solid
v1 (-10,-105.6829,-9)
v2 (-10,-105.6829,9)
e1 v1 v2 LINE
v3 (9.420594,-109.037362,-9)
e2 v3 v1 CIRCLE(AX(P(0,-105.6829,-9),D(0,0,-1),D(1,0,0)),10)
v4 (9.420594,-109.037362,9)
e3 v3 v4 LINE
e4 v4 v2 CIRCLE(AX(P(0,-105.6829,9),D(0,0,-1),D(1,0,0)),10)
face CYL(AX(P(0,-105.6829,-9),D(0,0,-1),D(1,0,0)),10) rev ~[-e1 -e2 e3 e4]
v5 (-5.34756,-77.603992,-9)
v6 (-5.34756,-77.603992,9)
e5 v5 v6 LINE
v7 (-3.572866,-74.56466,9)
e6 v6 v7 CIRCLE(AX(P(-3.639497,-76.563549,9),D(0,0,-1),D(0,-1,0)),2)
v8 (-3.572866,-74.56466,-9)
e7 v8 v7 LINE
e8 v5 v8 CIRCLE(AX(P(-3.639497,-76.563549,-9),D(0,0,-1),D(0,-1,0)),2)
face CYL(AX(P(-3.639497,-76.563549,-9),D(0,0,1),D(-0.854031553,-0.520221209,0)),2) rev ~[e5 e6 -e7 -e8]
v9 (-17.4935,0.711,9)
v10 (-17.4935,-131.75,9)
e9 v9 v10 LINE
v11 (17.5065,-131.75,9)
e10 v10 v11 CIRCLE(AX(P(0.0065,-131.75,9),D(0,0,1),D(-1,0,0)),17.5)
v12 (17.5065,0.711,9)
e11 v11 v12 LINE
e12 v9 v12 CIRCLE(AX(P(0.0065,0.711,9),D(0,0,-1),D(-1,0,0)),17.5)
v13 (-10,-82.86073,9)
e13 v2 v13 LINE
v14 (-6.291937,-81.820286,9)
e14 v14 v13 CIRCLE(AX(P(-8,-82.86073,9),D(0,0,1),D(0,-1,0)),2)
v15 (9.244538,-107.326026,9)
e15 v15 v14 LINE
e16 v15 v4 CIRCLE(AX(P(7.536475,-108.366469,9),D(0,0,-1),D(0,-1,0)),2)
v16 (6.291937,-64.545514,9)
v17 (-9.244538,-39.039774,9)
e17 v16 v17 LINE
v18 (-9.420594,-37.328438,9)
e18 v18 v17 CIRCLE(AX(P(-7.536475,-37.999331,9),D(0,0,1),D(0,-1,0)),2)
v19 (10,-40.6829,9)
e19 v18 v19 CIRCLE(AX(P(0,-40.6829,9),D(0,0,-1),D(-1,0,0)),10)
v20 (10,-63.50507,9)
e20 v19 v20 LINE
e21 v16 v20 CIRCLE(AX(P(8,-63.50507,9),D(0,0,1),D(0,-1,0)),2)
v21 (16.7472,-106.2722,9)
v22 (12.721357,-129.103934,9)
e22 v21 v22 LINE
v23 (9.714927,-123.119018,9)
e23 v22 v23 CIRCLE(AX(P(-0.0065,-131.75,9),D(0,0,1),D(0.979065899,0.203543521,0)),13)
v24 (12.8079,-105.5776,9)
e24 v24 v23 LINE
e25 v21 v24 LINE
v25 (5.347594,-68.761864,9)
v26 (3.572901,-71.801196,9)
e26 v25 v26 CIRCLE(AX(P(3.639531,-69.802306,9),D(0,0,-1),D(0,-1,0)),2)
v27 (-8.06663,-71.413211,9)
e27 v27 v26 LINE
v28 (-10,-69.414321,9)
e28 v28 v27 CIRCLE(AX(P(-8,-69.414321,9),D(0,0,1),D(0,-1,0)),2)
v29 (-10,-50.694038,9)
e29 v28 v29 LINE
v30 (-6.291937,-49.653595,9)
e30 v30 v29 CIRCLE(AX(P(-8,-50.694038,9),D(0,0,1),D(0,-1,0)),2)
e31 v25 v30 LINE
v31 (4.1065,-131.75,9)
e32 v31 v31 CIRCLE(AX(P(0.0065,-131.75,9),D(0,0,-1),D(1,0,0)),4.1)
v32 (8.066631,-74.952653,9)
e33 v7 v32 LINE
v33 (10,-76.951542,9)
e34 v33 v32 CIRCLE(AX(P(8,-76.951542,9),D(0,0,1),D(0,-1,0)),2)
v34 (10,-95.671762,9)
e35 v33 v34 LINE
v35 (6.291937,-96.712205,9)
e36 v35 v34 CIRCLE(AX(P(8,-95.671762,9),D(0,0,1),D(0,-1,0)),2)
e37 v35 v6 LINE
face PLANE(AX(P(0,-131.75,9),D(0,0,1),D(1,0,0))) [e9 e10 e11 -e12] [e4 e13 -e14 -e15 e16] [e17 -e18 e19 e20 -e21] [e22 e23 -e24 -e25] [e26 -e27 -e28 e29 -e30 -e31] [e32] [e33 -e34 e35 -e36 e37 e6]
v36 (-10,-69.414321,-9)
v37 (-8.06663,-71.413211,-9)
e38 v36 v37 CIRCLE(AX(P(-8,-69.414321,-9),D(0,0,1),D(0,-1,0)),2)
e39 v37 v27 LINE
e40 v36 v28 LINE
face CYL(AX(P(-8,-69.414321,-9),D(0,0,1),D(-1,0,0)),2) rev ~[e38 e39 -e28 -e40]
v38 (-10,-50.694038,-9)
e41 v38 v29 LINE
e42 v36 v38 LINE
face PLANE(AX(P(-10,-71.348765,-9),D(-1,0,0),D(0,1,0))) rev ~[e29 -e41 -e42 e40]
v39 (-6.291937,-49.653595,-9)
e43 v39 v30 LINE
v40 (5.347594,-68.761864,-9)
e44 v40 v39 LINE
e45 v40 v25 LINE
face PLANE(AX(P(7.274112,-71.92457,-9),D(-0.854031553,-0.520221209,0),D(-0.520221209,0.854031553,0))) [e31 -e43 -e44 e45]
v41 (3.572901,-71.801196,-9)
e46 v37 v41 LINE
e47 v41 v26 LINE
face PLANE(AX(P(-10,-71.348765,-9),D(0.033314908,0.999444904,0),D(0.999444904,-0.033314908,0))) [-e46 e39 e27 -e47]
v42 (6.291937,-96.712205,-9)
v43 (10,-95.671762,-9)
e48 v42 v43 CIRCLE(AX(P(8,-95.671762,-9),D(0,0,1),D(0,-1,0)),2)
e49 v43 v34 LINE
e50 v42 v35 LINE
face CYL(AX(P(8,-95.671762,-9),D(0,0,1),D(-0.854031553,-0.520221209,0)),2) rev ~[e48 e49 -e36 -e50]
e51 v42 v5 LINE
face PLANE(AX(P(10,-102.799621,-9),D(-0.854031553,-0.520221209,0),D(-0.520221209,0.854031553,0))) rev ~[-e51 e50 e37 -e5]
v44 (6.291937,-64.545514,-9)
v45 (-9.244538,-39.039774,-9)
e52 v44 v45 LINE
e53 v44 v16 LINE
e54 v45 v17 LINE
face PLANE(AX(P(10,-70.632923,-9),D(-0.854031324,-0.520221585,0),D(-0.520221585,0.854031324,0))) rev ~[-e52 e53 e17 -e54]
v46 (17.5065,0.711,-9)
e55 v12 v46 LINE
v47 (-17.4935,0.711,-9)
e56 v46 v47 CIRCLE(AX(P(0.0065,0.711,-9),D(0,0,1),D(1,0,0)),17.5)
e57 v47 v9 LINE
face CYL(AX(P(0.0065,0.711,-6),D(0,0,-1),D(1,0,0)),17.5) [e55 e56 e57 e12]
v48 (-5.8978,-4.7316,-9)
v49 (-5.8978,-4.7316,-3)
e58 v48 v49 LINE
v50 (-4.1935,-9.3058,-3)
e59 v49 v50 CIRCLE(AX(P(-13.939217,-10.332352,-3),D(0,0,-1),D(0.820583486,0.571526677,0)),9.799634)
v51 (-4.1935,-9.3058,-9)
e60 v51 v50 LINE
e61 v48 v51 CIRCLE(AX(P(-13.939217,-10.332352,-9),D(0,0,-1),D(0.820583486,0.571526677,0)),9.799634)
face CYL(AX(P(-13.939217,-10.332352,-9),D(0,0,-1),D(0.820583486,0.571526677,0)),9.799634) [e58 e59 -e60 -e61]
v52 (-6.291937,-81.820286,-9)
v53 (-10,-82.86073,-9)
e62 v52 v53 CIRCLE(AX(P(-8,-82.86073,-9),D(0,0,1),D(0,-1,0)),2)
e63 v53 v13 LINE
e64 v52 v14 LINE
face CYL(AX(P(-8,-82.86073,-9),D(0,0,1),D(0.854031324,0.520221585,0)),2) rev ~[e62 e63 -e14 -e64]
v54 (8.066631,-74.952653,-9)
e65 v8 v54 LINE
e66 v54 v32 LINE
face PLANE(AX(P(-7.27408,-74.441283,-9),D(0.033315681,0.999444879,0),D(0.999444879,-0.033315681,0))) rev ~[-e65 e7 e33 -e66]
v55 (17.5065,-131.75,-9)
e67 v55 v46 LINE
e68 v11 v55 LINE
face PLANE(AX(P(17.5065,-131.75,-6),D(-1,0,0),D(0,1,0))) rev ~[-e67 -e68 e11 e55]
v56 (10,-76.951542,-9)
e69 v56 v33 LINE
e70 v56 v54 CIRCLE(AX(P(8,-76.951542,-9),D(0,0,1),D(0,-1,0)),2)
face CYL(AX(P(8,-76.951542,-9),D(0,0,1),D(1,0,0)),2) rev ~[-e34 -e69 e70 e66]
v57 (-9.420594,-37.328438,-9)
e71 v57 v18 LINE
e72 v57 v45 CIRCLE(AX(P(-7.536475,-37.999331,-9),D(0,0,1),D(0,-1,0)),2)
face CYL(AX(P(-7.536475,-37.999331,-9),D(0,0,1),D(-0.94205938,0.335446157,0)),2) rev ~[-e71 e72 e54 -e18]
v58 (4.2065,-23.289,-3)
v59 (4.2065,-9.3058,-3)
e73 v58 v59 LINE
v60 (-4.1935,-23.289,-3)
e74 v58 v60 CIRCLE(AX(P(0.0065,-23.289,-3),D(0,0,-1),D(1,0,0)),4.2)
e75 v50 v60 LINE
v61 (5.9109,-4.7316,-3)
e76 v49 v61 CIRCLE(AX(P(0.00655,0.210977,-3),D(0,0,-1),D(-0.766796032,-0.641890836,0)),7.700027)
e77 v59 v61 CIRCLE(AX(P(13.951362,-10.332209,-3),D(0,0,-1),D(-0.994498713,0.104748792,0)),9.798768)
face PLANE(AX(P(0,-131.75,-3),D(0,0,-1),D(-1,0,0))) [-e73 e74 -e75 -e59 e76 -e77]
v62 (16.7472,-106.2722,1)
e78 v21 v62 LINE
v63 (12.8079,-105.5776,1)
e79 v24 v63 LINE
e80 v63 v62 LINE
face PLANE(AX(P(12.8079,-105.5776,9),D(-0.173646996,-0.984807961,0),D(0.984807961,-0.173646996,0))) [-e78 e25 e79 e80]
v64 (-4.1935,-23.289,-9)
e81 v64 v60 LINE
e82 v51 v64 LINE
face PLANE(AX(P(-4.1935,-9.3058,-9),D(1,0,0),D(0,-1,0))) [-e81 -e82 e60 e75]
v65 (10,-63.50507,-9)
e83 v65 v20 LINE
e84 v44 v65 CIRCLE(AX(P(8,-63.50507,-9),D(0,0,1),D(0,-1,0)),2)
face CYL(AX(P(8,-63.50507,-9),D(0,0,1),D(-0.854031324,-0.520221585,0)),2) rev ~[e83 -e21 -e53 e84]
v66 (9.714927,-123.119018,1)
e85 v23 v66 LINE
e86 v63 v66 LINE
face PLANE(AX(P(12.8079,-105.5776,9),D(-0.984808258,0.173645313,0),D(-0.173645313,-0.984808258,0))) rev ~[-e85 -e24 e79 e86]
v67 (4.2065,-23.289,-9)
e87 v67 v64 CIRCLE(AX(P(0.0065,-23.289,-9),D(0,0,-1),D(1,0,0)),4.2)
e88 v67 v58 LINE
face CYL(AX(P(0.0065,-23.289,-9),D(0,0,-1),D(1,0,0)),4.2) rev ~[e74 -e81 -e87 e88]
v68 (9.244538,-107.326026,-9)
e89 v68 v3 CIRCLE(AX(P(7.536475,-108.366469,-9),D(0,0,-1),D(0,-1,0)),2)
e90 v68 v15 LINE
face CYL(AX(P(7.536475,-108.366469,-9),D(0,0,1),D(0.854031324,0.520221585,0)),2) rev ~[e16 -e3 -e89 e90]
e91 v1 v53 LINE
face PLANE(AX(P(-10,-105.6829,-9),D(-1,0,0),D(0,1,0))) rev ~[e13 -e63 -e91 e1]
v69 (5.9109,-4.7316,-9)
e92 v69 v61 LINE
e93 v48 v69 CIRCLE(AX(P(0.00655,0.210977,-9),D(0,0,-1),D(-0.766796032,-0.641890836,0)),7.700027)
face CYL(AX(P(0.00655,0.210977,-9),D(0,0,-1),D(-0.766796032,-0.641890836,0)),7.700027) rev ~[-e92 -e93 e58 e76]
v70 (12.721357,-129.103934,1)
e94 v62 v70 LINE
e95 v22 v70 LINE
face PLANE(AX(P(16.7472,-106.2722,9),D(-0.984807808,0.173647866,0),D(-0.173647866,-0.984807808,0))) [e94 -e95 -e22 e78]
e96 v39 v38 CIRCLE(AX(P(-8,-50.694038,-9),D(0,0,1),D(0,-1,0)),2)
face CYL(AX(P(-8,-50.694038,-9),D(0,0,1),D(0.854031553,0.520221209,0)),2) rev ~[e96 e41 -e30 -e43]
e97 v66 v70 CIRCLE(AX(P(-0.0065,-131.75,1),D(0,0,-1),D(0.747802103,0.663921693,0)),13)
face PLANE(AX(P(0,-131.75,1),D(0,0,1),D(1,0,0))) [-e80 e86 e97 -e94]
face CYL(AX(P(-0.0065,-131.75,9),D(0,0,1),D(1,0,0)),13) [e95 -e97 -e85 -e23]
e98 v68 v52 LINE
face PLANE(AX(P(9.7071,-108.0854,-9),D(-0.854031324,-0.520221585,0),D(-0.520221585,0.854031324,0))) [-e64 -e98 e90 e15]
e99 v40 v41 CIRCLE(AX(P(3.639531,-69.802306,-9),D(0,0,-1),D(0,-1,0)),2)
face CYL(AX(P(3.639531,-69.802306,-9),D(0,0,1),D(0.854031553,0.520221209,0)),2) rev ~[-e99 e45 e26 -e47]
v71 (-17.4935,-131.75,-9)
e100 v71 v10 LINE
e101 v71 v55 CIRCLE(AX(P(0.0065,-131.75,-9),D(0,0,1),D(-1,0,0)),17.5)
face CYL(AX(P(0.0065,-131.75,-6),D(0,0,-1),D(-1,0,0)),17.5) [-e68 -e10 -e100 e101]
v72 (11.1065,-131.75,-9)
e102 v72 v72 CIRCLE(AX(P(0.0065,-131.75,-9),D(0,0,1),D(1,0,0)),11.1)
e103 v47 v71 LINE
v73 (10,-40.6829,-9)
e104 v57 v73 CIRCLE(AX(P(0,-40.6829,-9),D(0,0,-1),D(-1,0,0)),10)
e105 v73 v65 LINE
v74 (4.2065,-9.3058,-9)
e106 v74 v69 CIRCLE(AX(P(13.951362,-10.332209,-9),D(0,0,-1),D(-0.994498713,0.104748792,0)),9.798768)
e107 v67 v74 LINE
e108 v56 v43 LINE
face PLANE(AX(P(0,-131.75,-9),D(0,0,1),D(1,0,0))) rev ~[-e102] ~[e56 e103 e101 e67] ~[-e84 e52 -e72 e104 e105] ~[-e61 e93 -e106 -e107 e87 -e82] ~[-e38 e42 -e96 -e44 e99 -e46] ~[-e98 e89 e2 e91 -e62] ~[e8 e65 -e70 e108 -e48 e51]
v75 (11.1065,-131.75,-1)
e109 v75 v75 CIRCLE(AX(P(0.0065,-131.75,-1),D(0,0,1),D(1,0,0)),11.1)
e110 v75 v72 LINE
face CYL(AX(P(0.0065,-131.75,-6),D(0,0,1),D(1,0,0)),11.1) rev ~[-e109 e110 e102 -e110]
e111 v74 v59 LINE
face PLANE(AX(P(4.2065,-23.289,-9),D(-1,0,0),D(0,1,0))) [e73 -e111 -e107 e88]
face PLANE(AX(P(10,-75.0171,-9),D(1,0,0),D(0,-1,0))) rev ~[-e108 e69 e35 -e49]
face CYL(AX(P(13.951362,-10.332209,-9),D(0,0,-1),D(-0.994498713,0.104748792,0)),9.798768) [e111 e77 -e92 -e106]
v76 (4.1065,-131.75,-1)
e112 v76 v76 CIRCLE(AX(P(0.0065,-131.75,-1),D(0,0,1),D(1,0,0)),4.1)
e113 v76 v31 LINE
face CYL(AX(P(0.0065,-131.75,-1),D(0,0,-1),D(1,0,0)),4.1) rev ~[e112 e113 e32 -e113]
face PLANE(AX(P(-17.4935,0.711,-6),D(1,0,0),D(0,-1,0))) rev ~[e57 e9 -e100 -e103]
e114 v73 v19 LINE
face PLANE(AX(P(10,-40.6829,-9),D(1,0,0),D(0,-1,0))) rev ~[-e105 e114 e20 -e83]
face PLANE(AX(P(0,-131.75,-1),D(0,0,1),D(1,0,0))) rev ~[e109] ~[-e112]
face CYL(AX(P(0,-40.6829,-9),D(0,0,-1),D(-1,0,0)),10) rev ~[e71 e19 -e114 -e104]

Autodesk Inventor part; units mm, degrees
ref_plane "YZ Plane" through (0, 0, 0) normal (1, 0, 0) x (0, 1, 0)
ref_plane "XZ Plane" through (0, 0, 0) normal (0, 1, 0) x (-1, 0, 0)
ref_plane "XY Plane" through (0, 0, 0) normal (0, 0, 1) x (1, 0, 0)
sketch "Sketch1" plane through (0, 0, 0) normal (0, 0, 1) x (1, 0, 0)
  line L0 (0.0065, 132.461) -> (0.0065, 0) construction
  line L1 (-17.4935, 132.461) -> (-17.4935, 0)
  line L2 (17.5065, 0) -> (17.5065, 132.461)
  arc A0 (17.5065, 132.461) -> (-17.4935, 132.461) centre (0.0065, 132.461) ccw
  arc A1 (-17.4935, 0) -> (17.5065, 0) centre (0.0065, 0) ccw
  circle A2 centre (0.0065, 0) radius 11.1
  circle A3 centre (0.0065, 131.961) radius 7.5
  line L3 (4.0065, 131.961) -> (4.0065, 109.961)
  line L4 (4.0065, 109.961) -> (-3.9935, 109.961)
  line L5 (-3.9935, 109.961) -> (-3.9935, 131.961)
  line L6 (-3.9935, 131.961) -> (4.0065, 131.961)
  line L7 (0.0065, 101.721) -> (0.0065, -30.5)
  line L8 (0.0065, 131.961) -> (5.7519, 127.1401)
  line L9 (0.0065, 131.961) -> (0.0065, 124.461) construction
  arc A4 (5.7519, 127.1401) -> (4.0065, 122.4546) centre (13.9526, 121.4175) ccw
  line L10 (0.0065, 131.961) -> (-5.7388, 127.1401)
  arc A5 (-3.9935, 122.4546) -> (-5.7388, 127.1401) centre (-13.9395, 121.4175) ccw
  line L11 (0.0065, 132.461) -> (0.0065, 108.461) construction
  line L12 (4.0065, 132.461) -> (4.0065, 108.461)
  line L13 (-3.9935, 108.461) -> (-3.9935, 132.461)
  arc A6 (4.0065, 132.461) -> (-3.9935, 132.461) centre (0.0065, 132.461) ccw
  arc A7 (-3.9935, 108.461) -> (4.0065, 108.461) centre (0.0065, 108.461) ccw
  point P0 (0.0065, 131.961)
  point P1 (-3.9935, 122.4546)
  point P2 (-5.7388, 127.1401)
  point P3 (0.0065, 120.461)
  point P4 (-3.9935, 109.961)
  point P5 (4.0065, 109.961)
  dimension "d38" = 15
  dimension "d19" = 35
  dimension "d20" = 22.2
  dimension "d39" = 22
  dimension "d40" = 8
  dimension "d41" = 4
  dimension "d42" = 4
  dimension "d43" = 50
  dimension "d44" = 5
  dimension "d45" = 10
  dimension "d50" = 24
  dimension "d59" = 132.461
extrude "Extrusion1" add sketch "Sketch1" along normal mid plane 6
sketch "Sketch6" plane through (0, 0, 3) normal (0, 0, 1) x (1, 0, 0)
  arc A0 (-17.4935, 0) -> (17.5065, 0) centre (0.0065, 0) ccw projected
  line L0 (17.5065, 0) -> (17.5065, 132.461) projected
  arc A1 (17.5065, 132.461) -> (-17.4935, 132.461) centre (0.0065, 132.461) ccw projected
  line L1 (-17.4935, 132.461) -> (-17.4935, 0) projected
  arc A2 (-3.9935, 108.461) -> (4.0065, 108.461) centre (0.0065, 108.461) ccw projected
  line L2 (-3.9935, 108.461) -> (-3.9935, 122.4546) projected
  arc A3 (-3.9935, 122.4546) -> (-5.7388, 127.1401) centre (-13.9395, 121.4175) ccw projected
  arc A4 (5.7519, 127.1401) -> (-5.7388, 127.1401) centre (0.0065, 131.961) ccw projected
  arc A5 (5.7519, 127.1401) -> (4.0065, 122.4546) centre (13.9526, 121.4175) ccw projected
  line L3 (4.0065, 122.4546) -> (4.0065, 108.461) projected
  circle A6 centre (0.0065, 0) radius 11.1 projected
  point P0 (0, 0)
extrude "Extrusion4" add sketch "Sketch6" along normal blind 2 contours L1 A1 L0 A0 | L2 A3 A4 A5 L3 A2
sketch "Sketch7" plane through (0, 0, 5) normal (0, 0, 1) x (1, 0, 0)
  line L0 (0, 244.3) -> (0, -244.3) projected
  line L1 (17.5065, 0) -> (17.5065, 132.461) projected
  arc A0 (17.5065, 132.461) -> (-17.4935, 132.461) centre (0.0065, 132.461) ccw projected
  line L2 (-17.4935, 132.461) -> (-17.4935, 0) projected
  arc A1 (-17.4935, 0) -> (17.5065, 0) centre (0.0065, 0) ccw projected
  circle A2 centre (0.0065, 0) radius 11.1 projected
  circle A3 centre (0.0065, 0) radius 4.1
  point P0 (0, 0)
  point P1 (0, 11.1)
  point P2 (0, -11.1)
  point P3 (0, -17.5)
  point P4 (0, 149.961)
  dimension "d53" = 8.2
extrude "Extrusion5" add sketch "Sketch7" along normal blind 10 contours A0 L1 A1 L0 A2 | L0 A2 A1 L2 A0 | A2 L0 A3 | L0 A3 A2
sketch "Sketch9" plane through (0, 0, -3) normal (0, 0, -1) x (-1, 0, 0)
  line L0 (-4.0065, 122.4546) -> (-4.0065, 108.461) projected
  arc A0 (-4.0065, 108.461) -> (3.9935, 108.461) centre (-0.0065, 108.461) ccw projected
  line L1 (3.9935, 108.461) -> (3.9935, 122.4546) projected
  arc A1 (5.7388, 127.1401) -> (3.9935, 122.4546) centre (13.9395, 121.4175) ccw projected
  arc A2 (5.7388, 127.1401) -> (-5.7519, 127.1401) centre (-0.0065, 131.961) ccw projected
  arc A3 (-4.0065, 122.4546) -> (-5.7519, 127.1401) centre (-13.9526, 121.4175) ccw projected
  line L2 (4.1935, 122.4442) -> (4.1935, 108.461)
  arc A4 (-4.2065, 108.461) -> (4.1935, 108.461) centre (-0.0065, 108.461) ccw
  line L3 (-4.2065, 108.461) -> (-4.2065, 122.4442)
  arc A5 (-4.2065, 122.4442) -> (-5.9109, 127.0184) centre (-13.9526, 121.4175) ccw
  arc A6 (5.8978, 127.0184) -> (-5.9109, 127.0184) centre (-0.0065, 131.961) ccw
  arc A7 (5.8978, 127.0184) -> (4.1935, 122.4442) centre (13.9395, 121.4175) ccw
  point P0 (0, 0)
  dimension "d60" = 0.2
extrude "Extrusion7" cut sketch "Sketch9" against normal up to surface (6 mm away)
sketch "Sketch11" plane through (0, 0, 15) normal (0, 0, 1) x (1, 0, 0)
  line L0 (10.9002, -1.9232) -> (15.7624, 25.6515)
  line L1 (10.9002, -1.9232) -> (38.9002, -1.9232) construction
  circle A0 centre (-0.0065, 0) radius 11.075
  circle A1 centre (-0.0065, 0) radius 12
  line L2 (16.7472, 25.4778) -> (12.092, -0.9232)
  line L3 (12.8079, 26.1724) -> (7.325, -4.9232)
  circle A2 centre (-0.0065, 0) radius 13
  circle A3 centre (-0.0065, 0) radius 10
  line L4 (12.8079, 26.1724) -> (16.7472, 25.4778)
  point P0 (0, 0)
  point P1 (0, 0)
  point P2 (9.7149, 8.631)
  point P3 (12.7213, 2.6461)
  dimension "d74" = 28
  dimension "d75" = 80
  dimension "d76" = 24
  dimension "d77" = 1
  dimension "d78" = 3
  dimension "d80" = 2
extrude "Extrusion10" cut sketch "Sketch11" against normal blind 8 contours A2 L3 L4 L0 | L0 L4 L2 A2
sketch "Sketch13" plane through (0, 0, -3) normal (0, 0, -1) x (-1, 0, 0)
  line L0 (0, 101.0671) -> (0, 16.0671) construction
  line L1 (-10, 91.0671) -> (-10, 26.0671)
  line L2 (10, 26.0671) -> (10, 91.0671)
  arc A0 (10, 91.0671) -> (-10, 91.0671) centre (0, 91.0671) ccw
  arc A1 (-10, 26.0671) -> (10, 26.0671) centre (0, 26.0671) ccw
  line L3 (10, 26.0671) -> (10, 58.9004)
  line L4 (-10, 91.0671) -> (-10, 58.2338)
  line L5 (-10, 26.0671) -> (10, 58.9004)
  line L6 (10, 58.9004) -> (-10, 58.2338)
  line L7 (-10, 58.2338) -> (10, 91.0671)
  line L8 (33.0369, 58.1675) -> (-10, 56.7329)
  line L9 (32.9369, 61.1658) -> (-10.05, 59.7329)
  line L10 (-8.719, 57.4534) -> (11.281, 90.2868)
  line L11 (-11.281, 59.0141) -> (9.7071, 93.4696)
  line L12 (-9.7071, 23.6646) -> (11.281, 58.1201)
  line L13 (-11.281, 26.8474) -> (8.719, 59.6808)
  point P0 (0, 0)
  point P1 (0, 58.5671)
  point P2 (39.2224, 129.4846)
  point P3 (-10, 61.1171)
  point P4 (-10, 107.6003)
  point P5 (7.2741, 57.3087)
  point P6 (-10, 28.9505)
  point P7 (10, 56.017)
  point P8 (10, 60.4013)
  point P9 (-7.2741, 59.8255)
  point P10 (10, 88.1837)
  dimension "d97" = 20
  dimension "d98" = 65
  dimension "d99" = 32.8333
  dimension "d100" = 32.8333
  dimension "d101" = 1.5
  dimension "d102" = 1.5
  dimension "d103" = 1.5
  dimension "d104" = 1.5
  dimension "d105" = 1.5
  dimension "d106" = 1.5
extrude "Extrusion12" cut sketch "Sketch13" against normal up to next contours L8 L13 L1 | L1 A0 L11 | L10 L2 L9 | L12 L2 A1
fillet "Fillet2" radius 2 10 edges at (-9.7071, 93.4696, 6) (-10, 88.1837, 6) (10, 28.9505, 6) (10, 61.1171, 6) (-7.2741, 57.3087, 6) (-10, 56.017, 6) (9.7071, 23.6646, 6) (-10, 60.4013, 6) (7.2741, 59.8255, 6) (10, 56.7329, 6)
move or copy body "Move1" bodies to move or copy 1 copy no translate (0, -131.75, 0)
move or copy body "Move2" bodies to move or copy 1 copy no translate (0, 0, -6)
properties part number "EslabonRodillaCadera" material "PLA"
